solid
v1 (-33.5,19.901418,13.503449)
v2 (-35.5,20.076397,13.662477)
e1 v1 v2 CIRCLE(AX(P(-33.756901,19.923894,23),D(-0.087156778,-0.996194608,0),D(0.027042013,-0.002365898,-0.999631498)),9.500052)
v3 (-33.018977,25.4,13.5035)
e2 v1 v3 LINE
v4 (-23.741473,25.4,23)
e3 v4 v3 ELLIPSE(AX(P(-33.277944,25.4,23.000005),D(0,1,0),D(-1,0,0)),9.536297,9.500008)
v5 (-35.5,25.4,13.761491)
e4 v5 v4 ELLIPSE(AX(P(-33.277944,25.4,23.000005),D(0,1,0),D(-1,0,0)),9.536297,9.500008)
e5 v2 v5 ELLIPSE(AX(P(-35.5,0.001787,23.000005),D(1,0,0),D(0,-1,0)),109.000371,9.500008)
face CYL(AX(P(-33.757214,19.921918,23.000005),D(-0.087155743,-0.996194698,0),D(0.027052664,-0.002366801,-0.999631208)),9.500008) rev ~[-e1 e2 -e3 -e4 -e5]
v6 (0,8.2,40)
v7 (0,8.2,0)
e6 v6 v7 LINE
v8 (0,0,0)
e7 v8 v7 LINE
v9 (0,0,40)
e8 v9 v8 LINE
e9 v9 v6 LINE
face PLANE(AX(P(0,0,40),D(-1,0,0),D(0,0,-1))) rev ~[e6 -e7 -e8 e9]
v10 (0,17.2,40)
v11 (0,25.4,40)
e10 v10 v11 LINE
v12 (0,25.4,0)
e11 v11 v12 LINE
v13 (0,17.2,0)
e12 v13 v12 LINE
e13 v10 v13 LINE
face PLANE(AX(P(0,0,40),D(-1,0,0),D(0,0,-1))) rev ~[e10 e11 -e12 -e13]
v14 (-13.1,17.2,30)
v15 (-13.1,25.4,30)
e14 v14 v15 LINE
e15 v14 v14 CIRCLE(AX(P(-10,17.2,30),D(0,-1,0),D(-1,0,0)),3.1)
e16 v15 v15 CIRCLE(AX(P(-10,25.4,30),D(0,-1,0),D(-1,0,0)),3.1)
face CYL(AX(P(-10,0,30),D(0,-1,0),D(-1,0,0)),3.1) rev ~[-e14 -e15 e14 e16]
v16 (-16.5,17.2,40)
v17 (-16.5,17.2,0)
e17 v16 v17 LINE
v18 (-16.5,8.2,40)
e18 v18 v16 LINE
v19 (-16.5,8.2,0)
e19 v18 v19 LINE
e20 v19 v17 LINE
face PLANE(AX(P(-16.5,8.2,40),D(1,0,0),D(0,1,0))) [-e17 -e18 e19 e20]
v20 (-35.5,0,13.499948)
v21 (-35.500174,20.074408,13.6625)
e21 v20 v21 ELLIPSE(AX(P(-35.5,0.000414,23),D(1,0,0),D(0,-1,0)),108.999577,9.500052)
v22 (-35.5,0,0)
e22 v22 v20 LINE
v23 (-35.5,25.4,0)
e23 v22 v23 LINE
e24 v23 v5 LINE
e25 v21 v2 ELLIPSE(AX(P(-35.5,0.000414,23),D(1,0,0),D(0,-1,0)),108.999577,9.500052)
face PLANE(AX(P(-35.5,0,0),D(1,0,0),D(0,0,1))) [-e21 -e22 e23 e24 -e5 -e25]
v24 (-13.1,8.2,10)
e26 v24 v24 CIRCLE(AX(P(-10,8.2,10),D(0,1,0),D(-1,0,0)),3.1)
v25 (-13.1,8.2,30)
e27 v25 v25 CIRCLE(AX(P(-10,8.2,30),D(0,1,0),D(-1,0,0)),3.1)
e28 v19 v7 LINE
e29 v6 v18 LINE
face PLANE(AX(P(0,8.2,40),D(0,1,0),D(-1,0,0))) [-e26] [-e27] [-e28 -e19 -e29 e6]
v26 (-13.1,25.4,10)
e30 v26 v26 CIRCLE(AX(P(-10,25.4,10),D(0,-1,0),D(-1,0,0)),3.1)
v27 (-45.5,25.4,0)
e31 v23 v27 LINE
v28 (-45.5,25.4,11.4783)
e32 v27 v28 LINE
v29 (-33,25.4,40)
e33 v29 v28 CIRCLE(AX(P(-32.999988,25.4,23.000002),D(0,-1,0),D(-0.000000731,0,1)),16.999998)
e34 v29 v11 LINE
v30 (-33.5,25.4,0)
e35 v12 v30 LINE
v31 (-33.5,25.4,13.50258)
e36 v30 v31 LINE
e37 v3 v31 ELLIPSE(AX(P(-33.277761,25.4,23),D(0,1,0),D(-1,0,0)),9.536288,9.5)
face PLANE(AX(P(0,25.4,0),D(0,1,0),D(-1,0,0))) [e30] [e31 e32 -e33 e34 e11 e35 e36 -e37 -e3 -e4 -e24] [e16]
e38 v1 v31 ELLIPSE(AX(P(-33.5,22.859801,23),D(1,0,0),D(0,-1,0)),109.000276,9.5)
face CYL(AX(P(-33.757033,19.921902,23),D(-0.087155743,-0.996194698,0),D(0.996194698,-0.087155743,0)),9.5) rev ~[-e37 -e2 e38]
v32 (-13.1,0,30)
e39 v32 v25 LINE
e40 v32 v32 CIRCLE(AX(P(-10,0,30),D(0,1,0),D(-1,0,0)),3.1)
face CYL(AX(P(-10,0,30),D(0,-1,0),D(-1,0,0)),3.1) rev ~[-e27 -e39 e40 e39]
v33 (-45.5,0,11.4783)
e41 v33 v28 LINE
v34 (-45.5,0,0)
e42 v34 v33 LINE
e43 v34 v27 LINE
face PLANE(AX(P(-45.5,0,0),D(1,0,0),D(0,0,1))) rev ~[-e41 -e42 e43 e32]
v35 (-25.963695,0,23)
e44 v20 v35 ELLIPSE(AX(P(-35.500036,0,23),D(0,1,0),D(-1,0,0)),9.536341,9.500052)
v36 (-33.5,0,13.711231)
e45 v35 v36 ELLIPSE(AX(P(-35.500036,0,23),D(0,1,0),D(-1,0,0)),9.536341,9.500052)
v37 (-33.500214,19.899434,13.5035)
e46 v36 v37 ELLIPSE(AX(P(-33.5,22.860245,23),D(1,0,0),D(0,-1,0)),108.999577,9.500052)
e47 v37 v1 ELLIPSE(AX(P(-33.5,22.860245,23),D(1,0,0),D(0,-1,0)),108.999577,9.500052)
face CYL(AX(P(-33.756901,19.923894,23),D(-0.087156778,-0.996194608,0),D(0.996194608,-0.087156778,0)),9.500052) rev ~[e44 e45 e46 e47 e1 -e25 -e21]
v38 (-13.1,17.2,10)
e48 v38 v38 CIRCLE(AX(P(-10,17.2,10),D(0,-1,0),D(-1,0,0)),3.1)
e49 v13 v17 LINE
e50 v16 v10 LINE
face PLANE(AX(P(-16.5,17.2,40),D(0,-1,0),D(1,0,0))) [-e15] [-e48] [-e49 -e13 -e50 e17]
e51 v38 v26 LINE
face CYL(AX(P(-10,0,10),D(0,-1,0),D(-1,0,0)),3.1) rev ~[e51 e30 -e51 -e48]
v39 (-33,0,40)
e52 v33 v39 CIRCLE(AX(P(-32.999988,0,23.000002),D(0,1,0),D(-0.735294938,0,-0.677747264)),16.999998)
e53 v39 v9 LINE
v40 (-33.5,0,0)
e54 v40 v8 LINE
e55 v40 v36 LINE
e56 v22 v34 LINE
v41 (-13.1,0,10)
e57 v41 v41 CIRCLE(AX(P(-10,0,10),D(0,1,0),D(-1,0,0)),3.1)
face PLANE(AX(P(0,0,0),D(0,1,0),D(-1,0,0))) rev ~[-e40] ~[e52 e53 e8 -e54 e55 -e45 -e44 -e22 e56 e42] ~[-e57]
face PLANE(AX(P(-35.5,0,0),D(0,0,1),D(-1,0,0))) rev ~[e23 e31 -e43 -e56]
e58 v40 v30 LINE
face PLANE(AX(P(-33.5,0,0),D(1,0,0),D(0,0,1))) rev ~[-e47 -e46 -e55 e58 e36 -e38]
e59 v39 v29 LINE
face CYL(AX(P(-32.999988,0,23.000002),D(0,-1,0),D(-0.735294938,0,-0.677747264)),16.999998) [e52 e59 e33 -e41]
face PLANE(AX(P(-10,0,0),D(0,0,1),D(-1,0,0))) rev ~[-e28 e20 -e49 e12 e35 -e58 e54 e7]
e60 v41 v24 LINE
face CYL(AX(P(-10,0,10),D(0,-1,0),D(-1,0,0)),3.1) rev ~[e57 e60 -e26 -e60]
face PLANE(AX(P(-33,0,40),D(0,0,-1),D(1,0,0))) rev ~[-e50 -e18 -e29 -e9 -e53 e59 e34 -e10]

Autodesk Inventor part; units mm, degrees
ref_plane "YZ Plane" through (0, 0, 0) normal (1, 0, 0) x (0, 1, 0)
ref_plane "XZ Plane" through (0, 0, 0) normal (0, 1, 0) x (-1, 0, 0)
ref_plane "XY Plane" through (0, 0, 0) normal (0, 0, 1) x (1, 0, 0)
sketch "Sketch1" plane through (0, 0, 0) normal (0, 1, 0) x (-1, 0, 0)
  line L0 (50, 0) -> (50, 40)
  line L1 (50, 40) -> (0, 40)
  line L2 (0, 40) -> (0, 0)
  line L3 (0, 0) -> (10, 0)
  line L4 (10, 0) -> (10, 10)
  line L5 (10, 10) -> (10, 30)
  circle A0 centre (10, 30) radius 3.1
  circle A1 centre (10, 10) radius 3.1
  line L6 (45.5, 0) -> (45.5, 11.4783)
  line L7 (0, 0) -> (33.5, 0)
  line L8 (35.5, 0) -> (35.5, 18.6699)
  line L9 (50, 40) -> (45.5, 40)
  line L10 (45.5, 40) -> (45.5, 35.5)
  line L11 (45.5, 35.5) -> (45.5, 34.5217)
  line L12 (45.5, 23) -> (33, 23)
  arc A2 (45.5, 11.4783) -> (33, 40) centre (33, 23) ccw
  line L13 (0, 0) -> (33.5, 0)
  line L14 (35.5, 0) -> (45.5, 0)
  line L15 (33.5, 0) -> (33.5, 18.0251)
  line L16 (0, 0) -> (33.5, 0)
  line L17 (35.5, 0) -> (45.5, 0)
  line L18 (33, 23) -> (28, 23)
  line L19 (33, 23) -> (38, 23)
  arc A3 (35.5, 18.6699) -> (38, 23) centre (33, 23) ccw
  arc A4 (28, 23) -> (33.5, 18.0251) centre (33, 23) ccw
  dimension "d0" = 50
  dimension "d1" = 40
  dimension "d2" = 10
  dimension "d3" = 10
  dimension "d4" = 20
  dimension "d5" = 6.2
  dimension "d6" = 6.2
  dimension "d7" = 45.5
  dimension "d8" = 35.5
  dimension "d9" = 4.5
  dimension "d10" = 4.5
  dimension "d13" = 12.5
  dimension "d14" = 12.5
  dimension "d15" = 2
extrude "Extrusion1" add sketch "Sketch1" along normal blind 25.4 contours A2 L6 L14 L8 A3 L12 L18 A4 L15 L7 L3 L2 L1
sketch "Sketch2" plane through (-33, 0, 40) normal (0, 0, 1) x (1, 0, 0)
  line L0 (33, 0) -> (33, 8.2)
  line L1 (33, 0) -> (33, 25.4) projected
  line L2 (33, 8.2) -> (16.5, 8.2)
  line L3 (16.5, 8.2) -> (16.5, 17.2)
  line L4 (16.5, 17.2) -> (33, 17.2)
  line L5 (33, 17.2) -> (33, 8.2)
  dimension "d18" = 8.2
  dimension "d19" = 16.5
  dimension "d20" = 9
extrude "Extrusion2" cut sketch "Sketch2" against normal through all
sketch "Sketch6" plane through (-28, 0, 23) normal (0, 0, -1) x (-1, 0, 0)
  line L0 (10, 25.4) -> (5.5, 25.4)
  line L1 (0, 25.4) -> (5.5, 25.4) projected
  line L2 (5.5, 25.4) -> (7.7222, 0)
  line L3 (7.5, 0) -> (17.5, 0) projected
  line L4 (5.5, 25.4) -> (30.997, 25.4) construction
  line L5 (7.5, 0) -> (8.3716, -9.9619)
  line L6 (7.5, 0) -> (17.5, 0) construction
  line L7 (15.2207, 20.7519) -> (-3.707, 19.0959)
  line L8 (-3.707, 19.0959) -> (-1.0923, -10.7899)
  line L9 (-1.0923, -10.7899) -> (8.3716, -9.9619)
  line L10 (8.3716, -9.9619) -> (5.7569, 19.9239)
  line L11 (8.3716, -9.9619) -> (38.3716, -9.9619) construction
  line L12 (8.3716, -9.9619) -> (5.7569, 19.9239)
  line L13 (-1.0923, -10.7899) -> (-3.707, 19.0959)
  line L14 (-1.0923, -10.7899) -> (28.9077, -10.7899) construction
  line L15 (-3.707, 19.0959) -> (5.7569, 19.9239)
  line L16 (5.7569, 19.9239) -> (8.3716, -9.9619)
  point P0 (-28, 0)
  dimension "d35" = 85
  dimension "d36" = 10
  dimension "d37" = 85
  dimension "d43" = 30
  dimension "d44" = 90
  dimension "d45" = 30
  dimension "d47" = 30
  dimension "d48" = 95
  dimension "d49" = 9.5
revolve "Revolution2" cut sketch "Sketch6" angle 360 about axis through (-36.3716, -9.9619, 23) along (0.0871557, 0.9961947, 0) contours L10 L5 L9 L8 L7
sketch "Sketch7" plane through (-35.5, 20.0764, 13.6625) normal (-0.0871557, -0.9961947, 0) x (0.9961947, -0.0871557, 0)
  arc A0 (2.0076, -0.159) -> (0, 0) centre (1.7498, 9.3375) ccw projected
  circle A1 centre (1.7498, 9.3375) radius 9.5
  point P0 (37.1147, -13.6625)
extrude "Extrusion3" cut sketch "Sketch7" against normal blind 10
properties part number "suporte-eixo"
